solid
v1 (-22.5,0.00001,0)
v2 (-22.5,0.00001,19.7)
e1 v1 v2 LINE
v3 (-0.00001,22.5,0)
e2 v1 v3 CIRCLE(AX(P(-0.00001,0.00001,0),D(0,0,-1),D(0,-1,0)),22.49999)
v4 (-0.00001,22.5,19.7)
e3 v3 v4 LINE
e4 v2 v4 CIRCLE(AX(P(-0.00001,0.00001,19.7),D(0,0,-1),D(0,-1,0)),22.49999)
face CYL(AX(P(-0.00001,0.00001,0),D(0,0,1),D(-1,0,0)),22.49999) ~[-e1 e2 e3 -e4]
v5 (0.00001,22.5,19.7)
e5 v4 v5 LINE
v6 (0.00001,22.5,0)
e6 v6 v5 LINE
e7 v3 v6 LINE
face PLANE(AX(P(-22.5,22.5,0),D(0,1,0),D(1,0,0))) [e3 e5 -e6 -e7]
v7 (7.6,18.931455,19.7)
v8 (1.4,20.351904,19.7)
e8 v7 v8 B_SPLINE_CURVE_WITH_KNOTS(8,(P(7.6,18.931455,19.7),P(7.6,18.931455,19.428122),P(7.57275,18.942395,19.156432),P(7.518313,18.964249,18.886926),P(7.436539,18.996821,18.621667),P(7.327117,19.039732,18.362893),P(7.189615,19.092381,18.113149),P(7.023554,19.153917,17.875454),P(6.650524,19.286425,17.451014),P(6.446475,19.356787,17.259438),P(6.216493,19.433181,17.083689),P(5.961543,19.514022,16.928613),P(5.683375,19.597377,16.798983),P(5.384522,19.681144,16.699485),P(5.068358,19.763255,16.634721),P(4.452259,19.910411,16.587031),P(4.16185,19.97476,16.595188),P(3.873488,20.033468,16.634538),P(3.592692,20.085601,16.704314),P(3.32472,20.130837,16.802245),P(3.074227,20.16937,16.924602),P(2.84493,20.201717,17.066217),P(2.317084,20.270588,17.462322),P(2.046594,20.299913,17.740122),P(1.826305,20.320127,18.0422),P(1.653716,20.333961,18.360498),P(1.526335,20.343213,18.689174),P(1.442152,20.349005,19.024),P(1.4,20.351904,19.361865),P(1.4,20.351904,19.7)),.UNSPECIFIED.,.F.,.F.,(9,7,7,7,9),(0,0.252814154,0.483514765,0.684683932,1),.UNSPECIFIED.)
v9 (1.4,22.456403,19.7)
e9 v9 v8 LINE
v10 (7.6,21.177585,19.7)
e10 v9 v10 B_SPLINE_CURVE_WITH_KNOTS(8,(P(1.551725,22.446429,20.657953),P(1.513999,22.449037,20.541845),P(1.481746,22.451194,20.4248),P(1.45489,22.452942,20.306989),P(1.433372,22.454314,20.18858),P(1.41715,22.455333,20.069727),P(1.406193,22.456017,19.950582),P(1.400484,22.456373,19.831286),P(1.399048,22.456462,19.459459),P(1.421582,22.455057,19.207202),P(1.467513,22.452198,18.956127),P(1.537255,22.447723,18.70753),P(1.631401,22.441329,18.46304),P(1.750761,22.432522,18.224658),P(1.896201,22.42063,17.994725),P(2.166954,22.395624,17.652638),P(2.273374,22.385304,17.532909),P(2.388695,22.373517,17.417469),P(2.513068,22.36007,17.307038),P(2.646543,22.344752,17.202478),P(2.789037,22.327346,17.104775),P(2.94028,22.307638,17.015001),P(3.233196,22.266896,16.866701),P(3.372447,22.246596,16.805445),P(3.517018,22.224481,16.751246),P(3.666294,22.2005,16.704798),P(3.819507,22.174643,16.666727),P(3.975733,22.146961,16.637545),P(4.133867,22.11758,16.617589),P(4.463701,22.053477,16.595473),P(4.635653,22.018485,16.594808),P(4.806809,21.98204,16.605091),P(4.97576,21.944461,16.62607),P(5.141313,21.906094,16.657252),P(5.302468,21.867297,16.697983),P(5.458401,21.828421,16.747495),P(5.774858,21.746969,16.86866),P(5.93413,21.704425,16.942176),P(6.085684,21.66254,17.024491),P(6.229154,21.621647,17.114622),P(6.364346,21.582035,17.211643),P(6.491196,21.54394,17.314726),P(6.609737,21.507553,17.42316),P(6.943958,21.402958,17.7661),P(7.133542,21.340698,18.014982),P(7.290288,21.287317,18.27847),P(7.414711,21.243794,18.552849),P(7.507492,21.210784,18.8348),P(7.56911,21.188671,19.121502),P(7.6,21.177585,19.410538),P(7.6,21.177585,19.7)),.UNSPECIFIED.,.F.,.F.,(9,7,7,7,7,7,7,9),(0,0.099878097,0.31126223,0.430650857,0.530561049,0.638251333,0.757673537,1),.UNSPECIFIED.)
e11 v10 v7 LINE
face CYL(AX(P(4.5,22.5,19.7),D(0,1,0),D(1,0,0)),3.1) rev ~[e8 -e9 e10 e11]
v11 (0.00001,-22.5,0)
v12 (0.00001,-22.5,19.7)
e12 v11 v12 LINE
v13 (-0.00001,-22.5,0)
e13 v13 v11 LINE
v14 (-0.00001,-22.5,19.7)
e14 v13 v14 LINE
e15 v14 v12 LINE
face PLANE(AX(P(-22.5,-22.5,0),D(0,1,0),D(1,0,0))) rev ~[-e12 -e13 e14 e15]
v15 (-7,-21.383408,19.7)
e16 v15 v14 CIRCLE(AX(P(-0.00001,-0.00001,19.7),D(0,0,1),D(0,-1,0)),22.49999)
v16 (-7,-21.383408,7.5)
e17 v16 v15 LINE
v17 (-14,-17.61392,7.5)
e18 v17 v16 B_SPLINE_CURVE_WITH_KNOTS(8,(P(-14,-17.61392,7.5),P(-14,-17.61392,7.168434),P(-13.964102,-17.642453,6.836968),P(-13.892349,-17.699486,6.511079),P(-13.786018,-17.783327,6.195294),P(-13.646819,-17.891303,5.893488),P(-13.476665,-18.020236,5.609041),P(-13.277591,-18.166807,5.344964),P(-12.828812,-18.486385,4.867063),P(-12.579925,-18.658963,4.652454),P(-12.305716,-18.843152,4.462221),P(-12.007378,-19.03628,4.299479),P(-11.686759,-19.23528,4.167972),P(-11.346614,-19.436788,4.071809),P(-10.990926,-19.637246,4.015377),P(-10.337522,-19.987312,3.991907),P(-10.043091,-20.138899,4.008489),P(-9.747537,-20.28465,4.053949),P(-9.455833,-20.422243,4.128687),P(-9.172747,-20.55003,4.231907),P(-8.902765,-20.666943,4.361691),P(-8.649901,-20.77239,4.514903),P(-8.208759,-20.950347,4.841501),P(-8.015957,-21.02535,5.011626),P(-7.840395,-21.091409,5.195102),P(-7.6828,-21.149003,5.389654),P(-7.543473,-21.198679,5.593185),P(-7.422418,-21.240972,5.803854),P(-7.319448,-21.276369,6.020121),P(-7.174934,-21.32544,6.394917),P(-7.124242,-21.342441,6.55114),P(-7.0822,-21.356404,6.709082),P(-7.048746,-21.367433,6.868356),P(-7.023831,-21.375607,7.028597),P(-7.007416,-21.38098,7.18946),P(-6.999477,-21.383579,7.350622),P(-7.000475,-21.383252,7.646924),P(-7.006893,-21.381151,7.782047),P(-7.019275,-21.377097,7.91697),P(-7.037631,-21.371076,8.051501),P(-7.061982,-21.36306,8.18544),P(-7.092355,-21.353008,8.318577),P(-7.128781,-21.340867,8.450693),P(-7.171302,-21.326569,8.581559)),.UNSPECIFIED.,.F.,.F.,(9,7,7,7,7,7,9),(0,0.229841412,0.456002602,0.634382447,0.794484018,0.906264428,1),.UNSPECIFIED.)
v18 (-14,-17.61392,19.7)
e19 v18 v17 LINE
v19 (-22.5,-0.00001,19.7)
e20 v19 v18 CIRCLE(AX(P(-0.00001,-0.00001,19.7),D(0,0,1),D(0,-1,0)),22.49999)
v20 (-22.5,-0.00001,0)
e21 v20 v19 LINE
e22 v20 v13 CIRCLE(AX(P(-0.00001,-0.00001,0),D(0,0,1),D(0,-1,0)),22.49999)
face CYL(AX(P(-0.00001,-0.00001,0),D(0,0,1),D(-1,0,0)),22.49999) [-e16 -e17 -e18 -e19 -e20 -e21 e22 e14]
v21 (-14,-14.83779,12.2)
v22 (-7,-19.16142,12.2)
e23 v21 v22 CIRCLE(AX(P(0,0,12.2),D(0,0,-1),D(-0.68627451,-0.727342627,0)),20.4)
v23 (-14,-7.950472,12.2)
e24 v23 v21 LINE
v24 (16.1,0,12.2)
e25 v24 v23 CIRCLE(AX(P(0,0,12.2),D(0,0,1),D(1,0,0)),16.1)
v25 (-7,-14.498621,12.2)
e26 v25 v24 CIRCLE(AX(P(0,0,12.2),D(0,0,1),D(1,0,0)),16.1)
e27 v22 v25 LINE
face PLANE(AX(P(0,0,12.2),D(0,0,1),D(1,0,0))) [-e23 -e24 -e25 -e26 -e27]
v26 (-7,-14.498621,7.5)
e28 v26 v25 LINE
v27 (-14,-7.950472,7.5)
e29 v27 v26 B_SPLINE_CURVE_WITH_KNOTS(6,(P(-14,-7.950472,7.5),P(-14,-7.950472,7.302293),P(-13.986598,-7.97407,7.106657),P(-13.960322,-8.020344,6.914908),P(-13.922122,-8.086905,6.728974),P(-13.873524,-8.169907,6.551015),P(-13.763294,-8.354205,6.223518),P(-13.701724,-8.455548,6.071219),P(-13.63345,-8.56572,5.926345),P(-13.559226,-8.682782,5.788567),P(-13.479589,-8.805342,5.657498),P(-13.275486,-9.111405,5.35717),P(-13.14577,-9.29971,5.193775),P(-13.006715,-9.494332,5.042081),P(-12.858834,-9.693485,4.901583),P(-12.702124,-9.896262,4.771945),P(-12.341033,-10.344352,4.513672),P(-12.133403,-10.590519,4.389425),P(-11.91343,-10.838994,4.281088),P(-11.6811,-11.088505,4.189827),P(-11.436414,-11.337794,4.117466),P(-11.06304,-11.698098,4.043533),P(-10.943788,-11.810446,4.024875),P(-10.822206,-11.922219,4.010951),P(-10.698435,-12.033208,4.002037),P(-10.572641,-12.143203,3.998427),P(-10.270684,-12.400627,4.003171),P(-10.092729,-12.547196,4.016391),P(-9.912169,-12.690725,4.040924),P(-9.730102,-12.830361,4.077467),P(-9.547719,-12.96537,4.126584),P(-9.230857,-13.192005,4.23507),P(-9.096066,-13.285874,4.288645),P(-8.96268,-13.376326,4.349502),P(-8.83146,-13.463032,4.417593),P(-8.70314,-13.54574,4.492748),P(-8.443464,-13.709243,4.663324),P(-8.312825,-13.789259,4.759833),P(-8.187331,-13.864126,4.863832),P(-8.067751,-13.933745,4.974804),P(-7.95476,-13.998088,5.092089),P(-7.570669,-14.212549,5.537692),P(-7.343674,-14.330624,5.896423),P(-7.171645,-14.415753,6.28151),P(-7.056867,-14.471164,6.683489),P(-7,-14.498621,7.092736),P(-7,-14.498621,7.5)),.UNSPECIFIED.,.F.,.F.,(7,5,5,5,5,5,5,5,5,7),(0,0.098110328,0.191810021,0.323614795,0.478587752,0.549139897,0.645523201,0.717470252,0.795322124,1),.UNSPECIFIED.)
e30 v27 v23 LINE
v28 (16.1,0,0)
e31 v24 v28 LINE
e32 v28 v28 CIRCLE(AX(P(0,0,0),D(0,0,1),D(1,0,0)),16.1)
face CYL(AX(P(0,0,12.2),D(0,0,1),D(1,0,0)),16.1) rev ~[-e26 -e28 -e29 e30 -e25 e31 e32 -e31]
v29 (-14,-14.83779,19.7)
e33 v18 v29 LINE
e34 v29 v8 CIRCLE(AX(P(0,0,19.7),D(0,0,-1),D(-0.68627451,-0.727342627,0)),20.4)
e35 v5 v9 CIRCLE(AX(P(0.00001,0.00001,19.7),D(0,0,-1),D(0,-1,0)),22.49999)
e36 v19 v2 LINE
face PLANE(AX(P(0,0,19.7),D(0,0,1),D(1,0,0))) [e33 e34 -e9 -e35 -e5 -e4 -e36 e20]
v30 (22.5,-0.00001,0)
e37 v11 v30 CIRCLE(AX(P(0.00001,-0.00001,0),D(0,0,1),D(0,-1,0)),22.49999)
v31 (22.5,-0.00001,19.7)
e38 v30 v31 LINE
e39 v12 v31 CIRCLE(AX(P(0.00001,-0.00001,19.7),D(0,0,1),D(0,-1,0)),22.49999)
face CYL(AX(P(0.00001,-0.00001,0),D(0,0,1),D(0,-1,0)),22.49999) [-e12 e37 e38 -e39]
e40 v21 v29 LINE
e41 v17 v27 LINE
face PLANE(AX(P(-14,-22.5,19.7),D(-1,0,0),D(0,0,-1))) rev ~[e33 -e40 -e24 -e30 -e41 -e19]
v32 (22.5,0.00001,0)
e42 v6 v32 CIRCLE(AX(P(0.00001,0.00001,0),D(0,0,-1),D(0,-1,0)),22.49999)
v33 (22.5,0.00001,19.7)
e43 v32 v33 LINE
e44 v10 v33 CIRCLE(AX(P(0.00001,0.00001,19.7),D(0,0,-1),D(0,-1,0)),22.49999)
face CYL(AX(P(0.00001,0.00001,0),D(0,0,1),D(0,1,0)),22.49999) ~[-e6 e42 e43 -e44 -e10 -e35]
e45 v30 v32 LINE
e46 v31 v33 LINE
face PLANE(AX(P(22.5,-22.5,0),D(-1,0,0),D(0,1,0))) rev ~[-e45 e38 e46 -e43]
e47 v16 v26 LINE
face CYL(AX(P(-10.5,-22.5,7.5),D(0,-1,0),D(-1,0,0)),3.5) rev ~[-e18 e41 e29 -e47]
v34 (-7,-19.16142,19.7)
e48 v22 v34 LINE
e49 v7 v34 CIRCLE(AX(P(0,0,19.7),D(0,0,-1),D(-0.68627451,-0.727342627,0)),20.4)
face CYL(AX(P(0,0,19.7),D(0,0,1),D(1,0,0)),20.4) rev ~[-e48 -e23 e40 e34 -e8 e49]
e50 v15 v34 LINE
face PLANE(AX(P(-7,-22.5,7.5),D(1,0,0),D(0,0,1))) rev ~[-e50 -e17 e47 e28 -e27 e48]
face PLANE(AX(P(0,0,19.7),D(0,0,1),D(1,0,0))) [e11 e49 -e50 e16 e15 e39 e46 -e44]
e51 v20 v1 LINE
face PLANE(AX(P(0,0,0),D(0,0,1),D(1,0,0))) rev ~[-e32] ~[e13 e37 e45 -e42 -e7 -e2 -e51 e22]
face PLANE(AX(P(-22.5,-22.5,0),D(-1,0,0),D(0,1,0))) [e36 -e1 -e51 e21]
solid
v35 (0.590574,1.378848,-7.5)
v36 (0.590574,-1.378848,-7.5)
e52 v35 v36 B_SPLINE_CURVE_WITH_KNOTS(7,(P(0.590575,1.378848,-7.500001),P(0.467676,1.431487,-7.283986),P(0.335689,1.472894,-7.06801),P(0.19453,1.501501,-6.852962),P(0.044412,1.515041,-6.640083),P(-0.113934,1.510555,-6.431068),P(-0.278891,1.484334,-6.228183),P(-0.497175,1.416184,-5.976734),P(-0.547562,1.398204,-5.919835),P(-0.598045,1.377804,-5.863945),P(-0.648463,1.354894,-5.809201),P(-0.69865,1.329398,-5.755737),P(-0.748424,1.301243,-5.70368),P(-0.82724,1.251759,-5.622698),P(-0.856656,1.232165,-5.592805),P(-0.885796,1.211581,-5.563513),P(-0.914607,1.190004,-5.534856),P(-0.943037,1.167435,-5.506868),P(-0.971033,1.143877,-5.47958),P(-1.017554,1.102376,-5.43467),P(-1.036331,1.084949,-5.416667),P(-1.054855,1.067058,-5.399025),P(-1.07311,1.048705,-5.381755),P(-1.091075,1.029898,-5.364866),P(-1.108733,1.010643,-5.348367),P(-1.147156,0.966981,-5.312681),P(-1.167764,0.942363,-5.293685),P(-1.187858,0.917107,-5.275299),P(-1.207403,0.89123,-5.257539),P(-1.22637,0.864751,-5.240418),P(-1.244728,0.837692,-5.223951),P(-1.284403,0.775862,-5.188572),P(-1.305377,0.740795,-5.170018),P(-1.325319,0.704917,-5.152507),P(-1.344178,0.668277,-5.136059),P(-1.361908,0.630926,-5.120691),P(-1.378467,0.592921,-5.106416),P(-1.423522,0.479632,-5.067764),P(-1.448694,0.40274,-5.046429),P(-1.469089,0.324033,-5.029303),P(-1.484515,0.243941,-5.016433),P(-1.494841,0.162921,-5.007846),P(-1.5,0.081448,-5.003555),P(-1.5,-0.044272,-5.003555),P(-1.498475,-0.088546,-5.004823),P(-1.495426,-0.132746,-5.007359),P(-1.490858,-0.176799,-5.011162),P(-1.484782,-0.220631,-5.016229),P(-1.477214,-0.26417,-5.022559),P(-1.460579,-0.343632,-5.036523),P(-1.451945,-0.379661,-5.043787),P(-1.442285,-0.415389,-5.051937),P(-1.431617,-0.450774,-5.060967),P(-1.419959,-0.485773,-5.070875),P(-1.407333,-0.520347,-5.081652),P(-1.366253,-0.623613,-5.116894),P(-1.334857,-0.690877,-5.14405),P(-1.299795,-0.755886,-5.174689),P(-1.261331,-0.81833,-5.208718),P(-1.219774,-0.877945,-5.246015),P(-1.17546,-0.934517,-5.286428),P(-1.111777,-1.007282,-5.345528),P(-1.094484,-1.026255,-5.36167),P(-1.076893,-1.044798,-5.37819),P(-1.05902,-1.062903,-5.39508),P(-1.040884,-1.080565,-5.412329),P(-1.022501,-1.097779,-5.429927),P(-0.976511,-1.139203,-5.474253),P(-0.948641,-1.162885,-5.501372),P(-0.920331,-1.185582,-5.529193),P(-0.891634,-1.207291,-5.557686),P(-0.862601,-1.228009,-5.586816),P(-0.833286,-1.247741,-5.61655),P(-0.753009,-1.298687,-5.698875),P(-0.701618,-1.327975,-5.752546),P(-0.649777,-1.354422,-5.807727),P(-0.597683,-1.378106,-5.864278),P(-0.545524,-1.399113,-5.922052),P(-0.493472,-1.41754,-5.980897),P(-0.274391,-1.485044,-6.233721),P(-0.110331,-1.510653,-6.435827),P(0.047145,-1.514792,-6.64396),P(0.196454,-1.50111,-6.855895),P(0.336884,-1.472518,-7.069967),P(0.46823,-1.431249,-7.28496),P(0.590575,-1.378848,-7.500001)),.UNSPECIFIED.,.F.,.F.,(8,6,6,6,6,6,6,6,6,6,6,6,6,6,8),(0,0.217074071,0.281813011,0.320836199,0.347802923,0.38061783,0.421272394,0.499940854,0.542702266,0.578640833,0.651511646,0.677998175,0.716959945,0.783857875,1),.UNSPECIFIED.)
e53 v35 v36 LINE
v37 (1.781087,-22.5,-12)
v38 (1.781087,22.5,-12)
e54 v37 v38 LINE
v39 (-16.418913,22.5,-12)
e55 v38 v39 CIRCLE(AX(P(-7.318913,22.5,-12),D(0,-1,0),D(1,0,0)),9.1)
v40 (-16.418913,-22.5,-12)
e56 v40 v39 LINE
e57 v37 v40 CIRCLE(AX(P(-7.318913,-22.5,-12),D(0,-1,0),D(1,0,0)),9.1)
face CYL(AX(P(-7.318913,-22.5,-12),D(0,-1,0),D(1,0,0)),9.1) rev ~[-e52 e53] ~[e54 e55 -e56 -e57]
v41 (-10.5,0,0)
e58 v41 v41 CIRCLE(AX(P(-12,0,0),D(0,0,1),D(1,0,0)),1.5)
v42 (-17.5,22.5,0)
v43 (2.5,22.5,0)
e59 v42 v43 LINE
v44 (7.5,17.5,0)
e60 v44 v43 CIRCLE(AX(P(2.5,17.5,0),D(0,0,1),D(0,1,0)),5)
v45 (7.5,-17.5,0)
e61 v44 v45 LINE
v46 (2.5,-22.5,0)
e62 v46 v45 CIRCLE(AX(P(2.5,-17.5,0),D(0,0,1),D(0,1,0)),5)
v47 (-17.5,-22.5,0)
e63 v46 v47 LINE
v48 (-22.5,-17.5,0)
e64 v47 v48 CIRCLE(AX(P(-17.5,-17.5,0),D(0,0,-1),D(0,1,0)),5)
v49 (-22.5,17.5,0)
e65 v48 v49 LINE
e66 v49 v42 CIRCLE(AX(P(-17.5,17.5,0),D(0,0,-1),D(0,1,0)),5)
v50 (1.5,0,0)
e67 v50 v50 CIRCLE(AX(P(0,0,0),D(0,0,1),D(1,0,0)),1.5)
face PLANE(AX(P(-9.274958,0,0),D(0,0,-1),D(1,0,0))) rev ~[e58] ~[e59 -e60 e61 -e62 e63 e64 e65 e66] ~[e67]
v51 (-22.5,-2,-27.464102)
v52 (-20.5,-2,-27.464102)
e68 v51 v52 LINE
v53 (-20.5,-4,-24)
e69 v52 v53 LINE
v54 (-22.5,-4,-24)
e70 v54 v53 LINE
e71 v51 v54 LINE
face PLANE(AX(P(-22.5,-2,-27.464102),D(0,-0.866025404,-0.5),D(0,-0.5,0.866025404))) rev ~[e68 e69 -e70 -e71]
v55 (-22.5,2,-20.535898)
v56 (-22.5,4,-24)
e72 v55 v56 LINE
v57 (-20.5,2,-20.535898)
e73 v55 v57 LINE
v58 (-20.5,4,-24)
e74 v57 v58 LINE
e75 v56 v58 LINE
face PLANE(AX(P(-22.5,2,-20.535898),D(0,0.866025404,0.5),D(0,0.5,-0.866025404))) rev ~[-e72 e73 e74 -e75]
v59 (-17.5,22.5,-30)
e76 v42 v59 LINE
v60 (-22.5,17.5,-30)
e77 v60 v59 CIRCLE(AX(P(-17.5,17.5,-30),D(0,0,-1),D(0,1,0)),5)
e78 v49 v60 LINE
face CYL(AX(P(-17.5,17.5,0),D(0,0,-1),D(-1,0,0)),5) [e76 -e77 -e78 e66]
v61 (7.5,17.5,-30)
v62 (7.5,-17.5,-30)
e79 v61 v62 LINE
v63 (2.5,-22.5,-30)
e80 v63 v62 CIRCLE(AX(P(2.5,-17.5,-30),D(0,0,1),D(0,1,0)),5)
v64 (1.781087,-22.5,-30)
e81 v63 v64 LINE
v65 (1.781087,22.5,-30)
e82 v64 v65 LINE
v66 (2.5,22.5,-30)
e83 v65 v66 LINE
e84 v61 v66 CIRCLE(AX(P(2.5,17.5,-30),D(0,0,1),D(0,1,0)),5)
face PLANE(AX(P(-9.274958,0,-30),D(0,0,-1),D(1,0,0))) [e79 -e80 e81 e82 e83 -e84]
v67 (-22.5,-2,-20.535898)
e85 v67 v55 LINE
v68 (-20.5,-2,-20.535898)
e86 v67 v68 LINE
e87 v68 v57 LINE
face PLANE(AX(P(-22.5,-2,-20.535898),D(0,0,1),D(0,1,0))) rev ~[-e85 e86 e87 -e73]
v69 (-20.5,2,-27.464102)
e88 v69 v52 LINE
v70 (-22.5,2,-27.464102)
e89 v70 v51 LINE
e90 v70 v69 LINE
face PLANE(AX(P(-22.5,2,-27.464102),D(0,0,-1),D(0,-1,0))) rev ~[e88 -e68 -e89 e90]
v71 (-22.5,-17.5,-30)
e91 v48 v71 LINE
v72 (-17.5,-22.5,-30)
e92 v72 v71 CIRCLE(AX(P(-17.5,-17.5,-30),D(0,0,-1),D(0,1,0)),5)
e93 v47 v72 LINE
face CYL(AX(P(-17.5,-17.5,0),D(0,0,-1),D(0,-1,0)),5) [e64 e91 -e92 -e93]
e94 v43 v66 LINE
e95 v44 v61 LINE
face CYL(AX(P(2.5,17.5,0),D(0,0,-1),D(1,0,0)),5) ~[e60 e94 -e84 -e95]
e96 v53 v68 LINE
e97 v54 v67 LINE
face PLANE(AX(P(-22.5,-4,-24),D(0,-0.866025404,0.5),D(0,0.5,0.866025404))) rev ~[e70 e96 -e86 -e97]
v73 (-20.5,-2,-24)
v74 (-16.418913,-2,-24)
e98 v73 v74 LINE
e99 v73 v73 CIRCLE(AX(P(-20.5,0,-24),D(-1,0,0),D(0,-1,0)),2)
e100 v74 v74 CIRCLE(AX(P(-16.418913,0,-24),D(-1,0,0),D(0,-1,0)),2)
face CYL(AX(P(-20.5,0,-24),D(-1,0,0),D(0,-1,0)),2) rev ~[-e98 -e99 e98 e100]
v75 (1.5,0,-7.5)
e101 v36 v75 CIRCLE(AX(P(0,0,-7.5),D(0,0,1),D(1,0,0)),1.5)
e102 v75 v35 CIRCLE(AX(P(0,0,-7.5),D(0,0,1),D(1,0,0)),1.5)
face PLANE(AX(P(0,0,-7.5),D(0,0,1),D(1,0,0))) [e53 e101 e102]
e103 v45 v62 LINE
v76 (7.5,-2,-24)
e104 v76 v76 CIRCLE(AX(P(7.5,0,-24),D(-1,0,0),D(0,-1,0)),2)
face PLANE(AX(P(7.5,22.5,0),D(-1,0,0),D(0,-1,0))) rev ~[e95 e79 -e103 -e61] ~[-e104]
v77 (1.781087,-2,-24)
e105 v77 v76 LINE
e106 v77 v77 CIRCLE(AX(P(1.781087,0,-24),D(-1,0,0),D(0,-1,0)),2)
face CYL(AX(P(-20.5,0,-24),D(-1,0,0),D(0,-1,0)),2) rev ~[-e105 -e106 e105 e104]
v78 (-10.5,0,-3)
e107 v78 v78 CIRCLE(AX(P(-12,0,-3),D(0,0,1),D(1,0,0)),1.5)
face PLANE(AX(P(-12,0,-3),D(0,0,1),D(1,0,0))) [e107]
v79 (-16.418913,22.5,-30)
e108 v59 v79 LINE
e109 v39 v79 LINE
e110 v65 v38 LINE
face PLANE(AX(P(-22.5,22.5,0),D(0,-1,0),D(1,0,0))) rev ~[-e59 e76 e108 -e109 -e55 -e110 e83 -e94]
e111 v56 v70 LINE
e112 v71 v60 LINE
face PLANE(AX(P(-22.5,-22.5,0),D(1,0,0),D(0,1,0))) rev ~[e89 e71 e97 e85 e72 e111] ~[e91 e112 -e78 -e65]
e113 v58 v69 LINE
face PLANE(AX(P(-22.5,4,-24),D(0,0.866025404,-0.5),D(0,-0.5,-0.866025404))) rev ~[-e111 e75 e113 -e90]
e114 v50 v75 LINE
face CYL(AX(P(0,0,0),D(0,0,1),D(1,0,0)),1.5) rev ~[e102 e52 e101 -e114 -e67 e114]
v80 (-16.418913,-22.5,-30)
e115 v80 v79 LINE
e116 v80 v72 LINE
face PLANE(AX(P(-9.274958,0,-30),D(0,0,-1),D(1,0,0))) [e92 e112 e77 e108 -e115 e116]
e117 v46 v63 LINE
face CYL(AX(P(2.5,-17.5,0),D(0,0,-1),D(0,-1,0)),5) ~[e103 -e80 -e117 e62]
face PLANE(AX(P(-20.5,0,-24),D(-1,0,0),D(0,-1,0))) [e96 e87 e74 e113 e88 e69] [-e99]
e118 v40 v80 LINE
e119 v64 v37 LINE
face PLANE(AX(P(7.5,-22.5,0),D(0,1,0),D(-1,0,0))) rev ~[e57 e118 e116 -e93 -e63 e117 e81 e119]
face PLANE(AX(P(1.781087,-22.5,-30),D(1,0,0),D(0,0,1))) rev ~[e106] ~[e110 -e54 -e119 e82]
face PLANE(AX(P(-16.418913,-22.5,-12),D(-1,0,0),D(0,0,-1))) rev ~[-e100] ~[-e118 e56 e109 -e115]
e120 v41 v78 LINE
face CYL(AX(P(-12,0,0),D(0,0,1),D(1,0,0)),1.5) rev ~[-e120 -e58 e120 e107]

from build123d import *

# Parameters (mm, degrees)
F0_W      = 45
F0_H      = 45
F1_DEPTH  = 19.7
F2_R      = 20.4
F3_DEPTH  = 7.5
F4_R      = 16.1
F5_DEPTH  = 12.2
F7_DEPTH  = 14.5505284159
F9_DEPTH  = 3.5695447941
F11_DEPTH = 30
F13_DEPTH = 45
F14_R     = 22.49999
F16_DEPTH = 2
F17_R     = 2
F18_DEPTH = 43.0010001
F19_R     = 5
F20_R     = 1.5
F21_DEPTH = 7.5
F22_R     = 1.5
F23_DEPTH = 3


# Not quite as in the source:
# - a fillet or chamfer is up to 0.001 mm smaller than in the source, because OpenCascade refuses the exact size


with BuildPart() as f1:
    # F0 (on Top) → F1 (new body)
    with BuildSketch(Plane.XY):
        Rectangle(F0_W, F0_H)
    extrude(amount=F1_DEPTH)

    # F2 (on face) → F3 (cut)
    with BuildSketch(Plane.XY.offset(19.7)):
        Circle(F2_R)
    extrude(amount=-F3_DEPTH, mode=Mode.SUBTRACT)

    # F4 (on face) → F5 (cut, through all)
    with BuildSketch(Plane.XY.offset(12.2)):
        Circle(F4_R)
    extrude(amount=-F5_DEPTH, mode=Mode.SUBTRACT)

    # F6 (on face) → F7 (cut, through all)
    with BuildSketch(Plane.XZ.offset(22.5)):
        with BuildLine():
            Line((-14, 19.7), (-14, 7.5))
            ThreePointArc((-14, 7.5), (-10.5, 4), (-7, 7.5))
            Line((-7, 7.5), (-7, 19.7))
            Line((-7, 19.7), (-14, 19.7))
        make_face()
    extrude(amount=-F7_DEPTH, mode=Mode.SUBTRACT)

    # F8 (on face) → F9 (cut, through all)
    with BuildSketch(Plane(origin=(0, 22.5, 0), x_dir=(-1, 0, 0), z_dir=(0, 1, 0))):
        with BuildLine():
            Line((-1.4, 19.7), (-7.6, 19.7))
            ThreePointArc((-7.6, 19.7), (-4.5, 16.6), (-1.4, 19.7))
        make_face()
    extrude(amount=-F9_DEPTH, mode=Mode.SUBTRACT)

    # F14 (radius 22.5 in the source; OpenCascade refuses exactly that, so slightly less here)
    f14_edges = [f1.edges().sort_by_distance(p)[0] for p in [
        (22.5, -22.5, 9.85),
        (-22.5, -22.5, 9.85),
        (-22.5, 22.5, 9.85),
        (22.5, 22.5, 9.85),
    ]]
    fillet(f14_edges, radius=F14_R)


with BuildPart() as f11:
    # F10 (on face) → F11 (new body)
    with BuildSketch(Plane(origin=(0, 0, 0), x_dir=(1, 0, 0), z_dir=(0, 0, -1))):
        with BuildLine():
            Line((7.5, 22.5), (-22.5, 22.5))
            Line((-22.5, 22.5), (-22.5, -22.5))
            Line((-22.5, -22.5), (7.5, -22.5))
            Line((7.5, -22.5), (7.5, -14.2464030548))
            ThreePointArc((7.5, -14.2464030548), (-16.1, 0), (7.5, 14.2464030548))
            Line((7.5, 14.2464030548), (7.5, 22.5))
        make_face()
        with BuildLine():
            Line((7.5, -14.2464030548), (7.5, 14.2464030548))
            ThreePointArc((7.5, 14.2464030548), (-16.1, 0), (7.5, -14.2464030548))
        make_face()
    extrude(amount=F11_DEPTH)

    # F12 (on face) → F13 (cut, through all)
    with BuildSketch(Plane.XZ.offset(22.5)):
        with BuildLine():
            Line((1.7810865191, -30), (1.7810865191, -12))
            ThreePointArc((1.7810865191, -12), (-7.3189134809, -2.9), (-16.4189134809, -12))
            Line((-16.4189134809, -12), (-16.4189134809, -30))
            Line((-16.4189134809, -30), (1.7810865191, -30))
        make_face()
    extrude(amount=-F13_DEPTH, mode=Mode.SUBTRACT)

    # F15 (on face) → F16 (cut)
    with BuildSketch(Plane(origin=(-22.5, 0, 0), x_dir=(0, -1, 0), z_dir=(-1, 0, 0))):
        Polygon((-2, -27.4641016151), (2, -27.4641016151), (4, -24), (2, -20.5358983849), (-2, -20.5358983849), (-4, -24), align=None)
    extrude(amount=-F16_DEPTH, mode=Mode.SUBTRACT)

    # F17 (on face) → F18 (cut, through all)
    with BuildSketch(Plane(origin=(-20.5, 0, 0), x_dir=(0, -1, 0), z_dir=(-1, 0, 0))):
        with Locations((0, -24)):
            Circle(F17_R)
    extrude(amount=-F18_DEPTH, mode=Mode.SUBTRACT)

    # F19
    f19_edges = [f11.edges().sort_by_distance(p)[0] for p in [
        (-22.5, -22.5, -15),
        (7.5, -22.5, -15),
        (7.5, 22.5, -15),
        (-22.5, 22.5, -15),
    ]]
    fillet(f19_edges, radius=F19_R)

    # F20 (on face) → F21 (cut)
    with BuildSketch(Plane.XY):
        Circle(F20_R)
    extrude(amount=-F21_DEPTH, mode=Mode.SUBTRACT)

    # F22 (on face) → F23 (cut)
    with BuildSketch(Plane.XY):
        with Locations((-12, 0)):
            Circle(F22_R)
    extrude(amount=-F23_DEPTH, mode=Mode.SUBTRACT)


solid = Compound([f1.part, f11.part])
